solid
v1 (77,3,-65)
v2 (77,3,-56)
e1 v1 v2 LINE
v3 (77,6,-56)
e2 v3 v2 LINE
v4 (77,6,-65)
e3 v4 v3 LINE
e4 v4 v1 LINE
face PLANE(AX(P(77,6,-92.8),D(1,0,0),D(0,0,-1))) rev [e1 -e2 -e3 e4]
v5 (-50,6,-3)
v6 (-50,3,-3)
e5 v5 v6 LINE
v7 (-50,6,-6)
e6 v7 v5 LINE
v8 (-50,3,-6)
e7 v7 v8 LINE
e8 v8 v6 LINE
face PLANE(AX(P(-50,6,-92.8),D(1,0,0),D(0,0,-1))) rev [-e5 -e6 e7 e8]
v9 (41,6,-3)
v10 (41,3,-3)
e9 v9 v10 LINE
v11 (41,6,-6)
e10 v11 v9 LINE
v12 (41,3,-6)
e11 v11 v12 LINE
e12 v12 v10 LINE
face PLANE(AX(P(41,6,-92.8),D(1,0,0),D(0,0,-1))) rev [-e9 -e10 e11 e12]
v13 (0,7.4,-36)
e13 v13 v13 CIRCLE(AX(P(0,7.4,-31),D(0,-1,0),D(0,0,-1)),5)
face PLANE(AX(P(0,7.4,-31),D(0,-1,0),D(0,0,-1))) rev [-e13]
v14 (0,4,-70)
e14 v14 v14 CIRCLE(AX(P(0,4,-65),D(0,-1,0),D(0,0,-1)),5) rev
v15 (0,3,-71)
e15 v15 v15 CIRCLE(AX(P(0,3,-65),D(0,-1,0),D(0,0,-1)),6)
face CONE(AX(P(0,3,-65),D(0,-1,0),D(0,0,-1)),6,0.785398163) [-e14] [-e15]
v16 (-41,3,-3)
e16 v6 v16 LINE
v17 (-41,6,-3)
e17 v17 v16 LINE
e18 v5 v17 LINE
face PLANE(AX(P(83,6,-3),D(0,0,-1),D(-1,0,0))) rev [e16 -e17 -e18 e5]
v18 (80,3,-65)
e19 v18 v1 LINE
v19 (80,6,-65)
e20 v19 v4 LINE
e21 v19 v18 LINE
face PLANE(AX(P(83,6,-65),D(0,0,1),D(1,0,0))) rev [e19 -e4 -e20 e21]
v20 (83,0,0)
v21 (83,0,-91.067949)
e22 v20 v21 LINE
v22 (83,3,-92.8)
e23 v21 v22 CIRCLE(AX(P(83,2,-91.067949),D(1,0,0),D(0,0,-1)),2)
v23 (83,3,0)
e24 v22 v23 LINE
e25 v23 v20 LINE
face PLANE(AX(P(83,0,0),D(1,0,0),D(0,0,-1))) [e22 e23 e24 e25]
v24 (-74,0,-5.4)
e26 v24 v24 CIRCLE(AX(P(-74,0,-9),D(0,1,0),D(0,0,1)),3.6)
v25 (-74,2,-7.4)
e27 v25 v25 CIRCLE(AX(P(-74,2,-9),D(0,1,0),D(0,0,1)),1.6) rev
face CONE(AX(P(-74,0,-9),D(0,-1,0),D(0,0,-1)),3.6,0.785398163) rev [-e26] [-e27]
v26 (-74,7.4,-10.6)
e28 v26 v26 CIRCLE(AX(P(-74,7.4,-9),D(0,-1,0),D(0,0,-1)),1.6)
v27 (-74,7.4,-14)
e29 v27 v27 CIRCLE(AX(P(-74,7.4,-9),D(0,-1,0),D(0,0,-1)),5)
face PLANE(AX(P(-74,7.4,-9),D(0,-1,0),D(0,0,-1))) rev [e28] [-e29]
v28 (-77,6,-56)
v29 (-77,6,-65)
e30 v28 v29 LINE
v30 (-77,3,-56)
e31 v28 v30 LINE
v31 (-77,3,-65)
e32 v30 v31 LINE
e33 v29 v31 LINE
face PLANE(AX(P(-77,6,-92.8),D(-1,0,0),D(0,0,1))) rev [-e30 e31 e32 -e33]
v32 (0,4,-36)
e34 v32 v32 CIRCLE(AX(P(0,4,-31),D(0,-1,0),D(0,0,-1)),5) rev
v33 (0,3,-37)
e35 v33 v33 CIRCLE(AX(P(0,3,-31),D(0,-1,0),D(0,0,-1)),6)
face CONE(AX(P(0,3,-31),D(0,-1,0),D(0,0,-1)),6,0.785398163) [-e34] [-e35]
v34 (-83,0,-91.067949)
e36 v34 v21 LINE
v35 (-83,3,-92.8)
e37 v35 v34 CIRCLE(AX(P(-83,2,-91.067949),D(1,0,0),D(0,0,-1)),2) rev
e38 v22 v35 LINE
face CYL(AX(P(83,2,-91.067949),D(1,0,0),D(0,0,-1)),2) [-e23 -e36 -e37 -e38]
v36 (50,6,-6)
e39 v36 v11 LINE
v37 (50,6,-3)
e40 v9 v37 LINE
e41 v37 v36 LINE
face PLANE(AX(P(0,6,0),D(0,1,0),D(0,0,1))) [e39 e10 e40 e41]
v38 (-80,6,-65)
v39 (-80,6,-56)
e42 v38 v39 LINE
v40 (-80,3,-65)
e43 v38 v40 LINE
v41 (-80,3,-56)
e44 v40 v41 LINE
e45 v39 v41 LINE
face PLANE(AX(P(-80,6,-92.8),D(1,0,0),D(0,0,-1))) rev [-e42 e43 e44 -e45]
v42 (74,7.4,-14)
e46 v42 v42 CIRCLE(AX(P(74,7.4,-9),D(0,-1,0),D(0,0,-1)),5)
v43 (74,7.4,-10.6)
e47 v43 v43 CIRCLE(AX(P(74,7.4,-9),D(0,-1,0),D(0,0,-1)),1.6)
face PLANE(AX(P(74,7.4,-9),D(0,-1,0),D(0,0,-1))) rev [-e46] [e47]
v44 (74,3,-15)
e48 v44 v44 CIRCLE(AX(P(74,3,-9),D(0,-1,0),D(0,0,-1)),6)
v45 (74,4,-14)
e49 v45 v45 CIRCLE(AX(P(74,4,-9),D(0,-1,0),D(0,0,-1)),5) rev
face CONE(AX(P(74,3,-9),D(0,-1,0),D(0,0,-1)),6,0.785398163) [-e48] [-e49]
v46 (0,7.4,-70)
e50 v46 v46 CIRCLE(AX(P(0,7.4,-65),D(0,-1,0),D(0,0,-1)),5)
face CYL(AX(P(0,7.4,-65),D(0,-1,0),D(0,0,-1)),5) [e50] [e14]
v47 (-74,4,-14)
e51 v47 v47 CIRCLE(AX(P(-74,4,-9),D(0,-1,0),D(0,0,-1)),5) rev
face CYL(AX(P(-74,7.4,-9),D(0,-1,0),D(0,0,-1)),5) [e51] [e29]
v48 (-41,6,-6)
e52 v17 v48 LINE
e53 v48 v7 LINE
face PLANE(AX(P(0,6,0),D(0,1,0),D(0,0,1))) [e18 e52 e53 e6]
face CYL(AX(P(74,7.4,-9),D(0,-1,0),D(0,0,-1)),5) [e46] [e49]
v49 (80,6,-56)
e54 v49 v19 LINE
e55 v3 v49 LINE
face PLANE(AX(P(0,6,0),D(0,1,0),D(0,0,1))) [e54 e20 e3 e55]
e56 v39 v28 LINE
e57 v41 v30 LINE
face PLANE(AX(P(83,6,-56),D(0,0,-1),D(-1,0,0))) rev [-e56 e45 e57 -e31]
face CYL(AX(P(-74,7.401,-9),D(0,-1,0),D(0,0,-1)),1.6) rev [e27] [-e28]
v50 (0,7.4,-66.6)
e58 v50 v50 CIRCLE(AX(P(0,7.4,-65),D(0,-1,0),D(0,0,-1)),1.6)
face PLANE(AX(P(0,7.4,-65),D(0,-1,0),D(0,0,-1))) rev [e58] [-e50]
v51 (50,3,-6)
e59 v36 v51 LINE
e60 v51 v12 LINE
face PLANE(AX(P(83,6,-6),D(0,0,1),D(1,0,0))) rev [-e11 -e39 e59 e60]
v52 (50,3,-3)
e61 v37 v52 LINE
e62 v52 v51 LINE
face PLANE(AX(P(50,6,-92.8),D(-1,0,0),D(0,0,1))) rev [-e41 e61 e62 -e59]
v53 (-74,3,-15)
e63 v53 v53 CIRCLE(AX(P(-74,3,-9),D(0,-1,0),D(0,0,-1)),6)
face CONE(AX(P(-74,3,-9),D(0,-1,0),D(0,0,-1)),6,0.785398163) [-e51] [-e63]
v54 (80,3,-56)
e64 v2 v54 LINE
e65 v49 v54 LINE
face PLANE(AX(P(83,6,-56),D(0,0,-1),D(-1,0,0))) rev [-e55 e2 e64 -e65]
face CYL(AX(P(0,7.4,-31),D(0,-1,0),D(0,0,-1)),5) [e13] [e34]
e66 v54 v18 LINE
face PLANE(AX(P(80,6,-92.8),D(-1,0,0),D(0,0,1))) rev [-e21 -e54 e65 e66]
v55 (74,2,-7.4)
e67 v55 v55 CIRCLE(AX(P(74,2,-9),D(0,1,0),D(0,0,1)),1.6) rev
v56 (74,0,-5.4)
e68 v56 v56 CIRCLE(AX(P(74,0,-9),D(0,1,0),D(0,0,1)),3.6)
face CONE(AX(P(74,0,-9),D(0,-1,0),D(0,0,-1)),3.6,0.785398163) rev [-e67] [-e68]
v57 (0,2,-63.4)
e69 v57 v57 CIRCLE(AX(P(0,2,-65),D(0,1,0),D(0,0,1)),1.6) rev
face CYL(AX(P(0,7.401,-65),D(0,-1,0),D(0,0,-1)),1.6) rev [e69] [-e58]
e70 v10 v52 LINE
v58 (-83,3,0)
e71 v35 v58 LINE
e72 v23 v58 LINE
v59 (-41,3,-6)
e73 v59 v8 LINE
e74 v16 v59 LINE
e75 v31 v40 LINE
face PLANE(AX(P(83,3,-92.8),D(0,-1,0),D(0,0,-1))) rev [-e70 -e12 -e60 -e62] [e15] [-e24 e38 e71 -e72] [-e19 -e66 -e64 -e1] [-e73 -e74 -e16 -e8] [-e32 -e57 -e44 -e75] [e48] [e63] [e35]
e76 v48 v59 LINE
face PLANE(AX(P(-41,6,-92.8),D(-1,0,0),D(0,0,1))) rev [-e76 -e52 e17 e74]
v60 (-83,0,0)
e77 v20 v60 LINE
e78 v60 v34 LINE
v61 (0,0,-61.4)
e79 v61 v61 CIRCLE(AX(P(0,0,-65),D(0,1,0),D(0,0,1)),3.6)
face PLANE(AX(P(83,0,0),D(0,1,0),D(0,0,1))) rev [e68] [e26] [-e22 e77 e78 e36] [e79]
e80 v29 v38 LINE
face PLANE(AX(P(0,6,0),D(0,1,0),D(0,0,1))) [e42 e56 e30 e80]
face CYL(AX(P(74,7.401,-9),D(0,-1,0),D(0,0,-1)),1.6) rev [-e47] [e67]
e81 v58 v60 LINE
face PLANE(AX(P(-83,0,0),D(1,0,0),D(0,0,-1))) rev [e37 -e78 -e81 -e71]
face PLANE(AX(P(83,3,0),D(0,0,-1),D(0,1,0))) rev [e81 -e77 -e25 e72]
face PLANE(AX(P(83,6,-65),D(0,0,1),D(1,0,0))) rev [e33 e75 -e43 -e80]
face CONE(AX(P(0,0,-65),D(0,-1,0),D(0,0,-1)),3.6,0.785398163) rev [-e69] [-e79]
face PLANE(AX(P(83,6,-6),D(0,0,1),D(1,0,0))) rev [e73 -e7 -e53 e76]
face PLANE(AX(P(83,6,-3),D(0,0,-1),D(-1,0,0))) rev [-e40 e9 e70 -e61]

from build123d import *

# Parameters (mm, degrees)
EXTRUDE_1_DEPTH     = 83
EXTRUDE_START       = 3
SKETCH_2_R          = 5
EXTRUDE_2_DEPTH     = 4.4
SKETCH_3_R          = 1.6
CUT_EXTRUDE_1_DEPTH = 7.4
CHAMFER_1_SIZE      = 2
SKETCH_4_W          = 9
SKETCH_4_H          = 3
SKETCH_4_W_2        = 3
SKETCH_4_H_2        = 9
EXTRUDE_3_DEPTH     = 3
CHAMFER_2_SIZE      = 1
FILLET_1_R          = 2


with BuildPart() as part:
    # 草图1 → 凸台-拉伸1 (new, symmetric)
    with BuildSketch(Plane(origin=(0, 0, 0), x_dir=(0, 0, -1), z_dir=(1, 0, 0))):
        Polygon((0, 3), (0, 0), (95.8, 0), (92.8, 3), align=None)
    extrude(amount=EXTRUDE_1_DEPTH, both=True)

    # 草图2 → 凸台-拉伸2 (add)
    with BuildSketch(Plane(origin=(0, 0, 0), x_dir=(1, 0, 0), z_dir=(0, 1, 0)).offset(EXTRUDE_START)):
        with Locations(Location((-74, 9, 0), (0, 0, 90))):
            Circle(SKETCH_2_R)
        with Locations(Location((74, 9, 0), (0, 0, 90))):
            Circle(SKETCH_2_R)
        with Locations(Location((0, 65, 0), (0, 0, 90))):
            Circle(SKETCH_2_R)
        with Locations(Location((0, 31, 0), (0, 0, 90))):
            Circle(SKETCH_2_R)
    extrude(amount=EXTRUDE_2_DEPTH)

    # 草图3 → 切除-拉伸1 (cut)
    with BuildSketch(Plane(origin=(0, 0, 0), x_dir=(1, 0, 0), z_dir=(0, 1, 0))):
        with Locations(Location((74, 9, 0), (0, 0, 90))):
            Circle(SKETCH_3_R)
        with Locations(Location((-74, 9, 0), (0, 0, 90))):
            Circle(SKETCH_3_R)
        with Locations(Location((0, 65, 0), (0, 0, 90))):
            Circle(SKETCH_3_R)
    extrude(amount=CUT_EXTRUDE_1_DEPTH, mode=Mode.SUBTRACT)

    # 倒角1
    chamfer_1_edges = [part.edges().sort_by_distance(p)[0] for p in [
        (74, 0, -7.4),
        (-74, 0, -7.4),
        (0, 0, -63.4),
    ]]
    chamfer(chamfer_1_edges, length=CHAMFER_1_SIZE)

    # 草图4 → 凸台-拉伸3 (add)
    with BuildSketch(Plane(origin=(0, 0, 0), x_dir=(1, 0, 0), z_dir=(0, 1, 0)).offset(EXTRUDE_START)):
        with Locations((45.5, 4.5)):
            Rectangle(SKETCH_4_W, SKETCH_4_H)
        with Locations((-45.5, 4.5)):
            Rectangle(SKETCH_4_W, SKETCH_4_H)
        with Locations((-78.5, 60.5)):
            Rectangle(SKETCH_4_W_2, SKETCH_4_H_2)
        with Locations((78.5, 60.5)):
            Rectangle(SKETCH_4_W_2, SKETCH_4_H_2)
    extrude(amount=EXTRUDE_3_DEPTH)

    # 倒角2
    chamfer_2_edges = [part.edges().sort_by_distance(p)[0] for p in [
        (-74, 3, -4),
        (74, 3, -4),
        (0, 3, -60),
        (0, 3, -26),
    ]]
    chamfer(chamfer_2_edges, length=CHAMFER_2_SIZE)

    # 圆角1
    # the kernel refuses this fillet: 2 mm, written as the material it takes off along each edge
    with BuildSketch(Plane(origin=(-94.830127019, 0, -95.8), x_dir=(0, 0.7071067811865416, 0.7071067811865535), z_dir=(1, 0, 0))) as fillet_1_piece_1:
        with BuildLine():
            CenterArc((4.760278777, 1.931851653), FILLET_1_R, 135, 120)
            Line((3.346065215, 3.346065215), (3.317780944, 3.374349486))
            Line((3.317780944, 3.374349486), (-0.028284271, 0.028284271))
            Line((-0.028284271, 0.028284271), (0, -0.04))
            ThreePointArc((0, -0.04), (2.121320344, -0.04), (4.232287925, -0.038637033))
            Line((4.232287925, -0.038637033), (4.242640687, 0))
        make_face()
    extrude(amount=189.660254038, mode=Mode.SUBTRACT)


solid = part.part
